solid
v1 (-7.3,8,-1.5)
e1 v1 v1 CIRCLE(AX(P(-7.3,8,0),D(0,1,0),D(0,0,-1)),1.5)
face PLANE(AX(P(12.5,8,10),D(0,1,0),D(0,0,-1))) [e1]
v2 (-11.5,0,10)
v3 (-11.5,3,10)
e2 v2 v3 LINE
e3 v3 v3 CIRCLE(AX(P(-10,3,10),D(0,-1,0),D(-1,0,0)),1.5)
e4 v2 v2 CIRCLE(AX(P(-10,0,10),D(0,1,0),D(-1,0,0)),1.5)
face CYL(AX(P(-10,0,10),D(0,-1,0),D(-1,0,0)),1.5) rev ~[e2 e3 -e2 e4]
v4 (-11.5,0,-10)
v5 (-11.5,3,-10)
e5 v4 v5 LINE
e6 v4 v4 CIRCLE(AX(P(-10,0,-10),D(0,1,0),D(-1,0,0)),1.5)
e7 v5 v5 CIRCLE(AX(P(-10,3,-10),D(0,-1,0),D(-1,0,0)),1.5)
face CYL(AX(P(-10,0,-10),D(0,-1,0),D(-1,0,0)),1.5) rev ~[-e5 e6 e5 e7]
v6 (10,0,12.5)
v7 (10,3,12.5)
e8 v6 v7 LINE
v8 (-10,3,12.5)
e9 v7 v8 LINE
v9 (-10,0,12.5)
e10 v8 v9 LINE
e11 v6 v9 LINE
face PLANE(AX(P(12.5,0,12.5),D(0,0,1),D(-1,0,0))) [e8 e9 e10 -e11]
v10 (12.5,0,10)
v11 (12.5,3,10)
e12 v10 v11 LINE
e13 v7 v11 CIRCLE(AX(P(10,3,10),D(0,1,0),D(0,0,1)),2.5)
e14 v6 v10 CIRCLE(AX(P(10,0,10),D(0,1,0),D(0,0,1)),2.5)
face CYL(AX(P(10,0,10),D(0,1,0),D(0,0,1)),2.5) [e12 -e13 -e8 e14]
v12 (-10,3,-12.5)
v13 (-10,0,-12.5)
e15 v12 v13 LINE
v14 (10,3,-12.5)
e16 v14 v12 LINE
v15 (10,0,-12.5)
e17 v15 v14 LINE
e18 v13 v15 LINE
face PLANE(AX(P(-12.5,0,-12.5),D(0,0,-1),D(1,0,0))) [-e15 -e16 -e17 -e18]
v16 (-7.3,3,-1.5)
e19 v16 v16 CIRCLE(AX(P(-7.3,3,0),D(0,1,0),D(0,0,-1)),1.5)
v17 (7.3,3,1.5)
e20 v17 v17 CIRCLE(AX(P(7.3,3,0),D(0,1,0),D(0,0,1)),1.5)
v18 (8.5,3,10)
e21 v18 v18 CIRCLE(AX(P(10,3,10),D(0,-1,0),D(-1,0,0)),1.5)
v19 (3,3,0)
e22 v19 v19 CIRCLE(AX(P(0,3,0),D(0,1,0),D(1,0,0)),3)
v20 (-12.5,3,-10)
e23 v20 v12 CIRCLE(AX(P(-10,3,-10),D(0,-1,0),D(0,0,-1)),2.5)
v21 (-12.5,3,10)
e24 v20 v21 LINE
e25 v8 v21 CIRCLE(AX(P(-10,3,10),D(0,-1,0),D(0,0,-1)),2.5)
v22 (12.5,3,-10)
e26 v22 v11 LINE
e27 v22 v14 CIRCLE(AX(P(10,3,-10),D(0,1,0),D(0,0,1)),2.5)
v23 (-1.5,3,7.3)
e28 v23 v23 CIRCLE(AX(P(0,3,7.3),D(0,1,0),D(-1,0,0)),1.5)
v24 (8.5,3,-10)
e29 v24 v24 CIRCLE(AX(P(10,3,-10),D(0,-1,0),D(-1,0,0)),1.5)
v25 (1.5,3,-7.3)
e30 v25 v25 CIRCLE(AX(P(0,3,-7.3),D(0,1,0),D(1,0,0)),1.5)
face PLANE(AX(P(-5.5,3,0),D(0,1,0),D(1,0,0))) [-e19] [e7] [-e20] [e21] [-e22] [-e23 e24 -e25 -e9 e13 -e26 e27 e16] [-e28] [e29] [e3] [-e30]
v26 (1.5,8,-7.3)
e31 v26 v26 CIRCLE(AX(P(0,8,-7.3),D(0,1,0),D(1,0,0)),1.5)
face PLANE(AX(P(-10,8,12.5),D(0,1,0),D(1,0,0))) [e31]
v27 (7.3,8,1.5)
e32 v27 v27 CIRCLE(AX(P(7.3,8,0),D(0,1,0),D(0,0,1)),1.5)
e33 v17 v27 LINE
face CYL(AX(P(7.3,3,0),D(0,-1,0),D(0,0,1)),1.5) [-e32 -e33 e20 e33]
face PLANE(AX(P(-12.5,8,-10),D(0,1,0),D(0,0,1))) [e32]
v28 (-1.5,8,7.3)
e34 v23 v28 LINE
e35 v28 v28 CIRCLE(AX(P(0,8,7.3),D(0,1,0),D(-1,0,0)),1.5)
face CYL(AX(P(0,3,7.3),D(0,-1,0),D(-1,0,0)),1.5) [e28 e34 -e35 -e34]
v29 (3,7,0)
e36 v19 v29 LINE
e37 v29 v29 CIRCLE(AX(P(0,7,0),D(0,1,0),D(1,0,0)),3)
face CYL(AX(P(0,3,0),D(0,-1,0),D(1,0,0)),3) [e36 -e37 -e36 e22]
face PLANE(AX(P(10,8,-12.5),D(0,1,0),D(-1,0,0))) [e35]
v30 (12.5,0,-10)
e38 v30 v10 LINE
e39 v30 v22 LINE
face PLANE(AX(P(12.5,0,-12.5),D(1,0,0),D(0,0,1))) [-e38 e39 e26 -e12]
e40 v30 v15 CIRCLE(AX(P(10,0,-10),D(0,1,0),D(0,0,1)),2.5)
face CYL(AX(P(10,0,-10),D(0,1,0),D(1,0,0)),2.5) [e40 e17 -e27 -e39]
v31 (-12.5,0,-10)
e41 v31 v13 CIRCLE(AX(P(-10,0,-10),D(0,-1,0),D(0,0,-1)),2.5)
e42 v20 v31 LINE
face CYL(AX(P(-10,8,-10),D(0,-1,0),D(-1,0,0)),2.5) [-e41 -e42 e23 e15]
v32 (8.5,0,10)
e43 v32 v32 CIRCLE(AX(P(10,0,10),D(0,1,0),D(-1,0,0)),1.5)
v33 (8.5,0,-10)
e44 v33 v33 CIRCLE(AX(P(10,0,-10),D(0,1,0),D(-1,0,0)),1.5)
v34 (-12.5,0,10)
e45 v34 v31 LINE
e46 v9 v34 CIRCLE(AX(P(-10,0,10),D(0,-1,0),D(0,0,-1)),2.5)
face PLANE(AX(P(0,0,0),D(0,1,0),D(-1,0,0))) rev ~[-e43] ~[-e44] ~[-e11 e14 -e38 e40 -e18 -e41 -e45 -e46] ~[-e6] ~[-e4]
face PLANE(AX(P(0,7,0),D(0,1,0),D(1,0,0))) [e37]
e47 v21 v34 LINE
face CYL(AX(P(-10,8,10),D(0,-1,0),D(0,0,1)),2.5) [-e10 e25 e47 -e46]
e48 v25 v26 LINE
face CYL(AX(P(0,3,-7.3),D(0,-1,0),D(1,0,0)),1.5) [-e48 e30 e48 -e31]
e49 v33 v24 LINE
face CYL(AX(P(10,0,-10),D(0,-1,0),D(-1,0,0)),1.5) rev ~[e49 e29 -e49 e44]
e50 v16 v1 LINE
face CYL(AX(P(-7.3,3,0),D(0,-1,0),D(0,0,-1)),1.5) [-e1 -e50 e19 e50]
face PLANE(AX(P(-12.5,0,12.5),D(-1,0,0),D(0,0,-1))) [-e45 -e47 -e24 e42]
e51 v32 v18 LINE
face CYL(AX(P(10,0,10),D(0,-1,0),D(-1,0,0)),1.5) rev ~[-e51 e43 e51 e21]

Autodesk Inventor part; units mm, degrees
ref_plane "YZ Plane" through (0, 0, 0) normal (1, 0, 0) x (0, 1, 0)
ref_plane "XZ Plane" through (0, 0, 0) normal (0, 1, 0) x (-1, 0, 0)
ref_plane "XY Plane" through (0, 0, 0) normal (0, 0, 1) x (1, 0, 0)
sketch "Sketch1" plane through (0, 0, 0) normal (0, 1, 0) x (-1, 0, 0)
  line L0 (-12.5, 12.5) -> (12.5, 12.5)
  line L1 (12.5, 12.5) -> (12.5, -12.5)
  line L2 (12.5, -12.5) -> (-12.5, -12.5)
  line L3 (-12.5, -12.5) -> (-12.5, 12.5)
  line L4 (-12.5, 12.5) -> (12.5, -12.5) construction
  line L5 (12.5, 12.5) -> (-12.5, -12.5) construction
  line L6 (-10, 10) -> (10, 10) construction
  line L7 (10, 10) -> (10, -10) construction
  line L8 (10, -10) -> (-10, -10) construction
  line L9 (-10, -10) -> (-10, 10) construction
  line L10 (-10, 10) -> (10, -10) construction
  line L11 (10, 10) -> (-10, -10) construction
  circle A0 centre (10, 10) radius 1.5
  circle A1 centre (10, -10) radius 1.5
  circle A2 centre (-10, -10) radius 1.5
  circle A3 centre (-10, 10) radius 1.5
  point P0 (0, 0)
  dimension "d0" = 25
  dimension "d1" = 25
  dimension "d2" = 3
  dimension "d3" = 3
  dimension "d4" = 3
  dimension "d5" = 3
  dimension "d6" = 20
extrude "Extrusion1" add sketch "Sketch1" along normal blind 3
sketch "Sketch2" plane through (0, 3, 0) normal (0, 1, 0) x (1, 0, 0)
  circle A0 centre (0, 0) radius 3
  circle A1 centre (-5.5, 0) radius 1.5
  circle A2 centre (-2.75, -4.7631) radius 1.5
  circle A3 centre (2.75, -4.7631) radius 1.5
  circle A4 centre (5.5, 0) radius 1.5
  circle A5 centre (2.75, 4.7631) radius 1.5
  circle A6 centre (-2.75, 4.7631) radius 1.5
  dimension "d9" = 6
  dimension "d10" = 3
  dimension "d11" = 5.5
  dimension "d14" = 360
extrude "Extrusion2" add sketch "Sketch2" along normal blind 5 contours A1 | A2 | A3 | A4 | A5 | A6
sketch "Sketch3" plane through (0, 3, 0) normal (0, 1, 0) x (1, 0, 0)
  circle A0 centre (0, 0) radius 3
  dimension "d18" = 6
extrude "Extrusion3" add sketch "Sketch3" along normal blind 4
sketch "Sketch5" plane through (-5.5, 8, 0) normal (0, 1, 0) x (1, 0, 0)
  circle A0 centre (0, 0) radius 2.5
  circle A1 centre (2.75, -4.7631) radius 2.5
  circle A2 centre (8.25, -4.7631) radius 2.5
  circle A3 centre (11, 0) radius 2.5
  circle A4 centre (8.25, 4.7631) radius 2.5
  circle A5 centre (2.75, 4.7631) radius 2.5
  circle A6 centre (5.5, 0) radius 3.5
  circle A7 centre (0, 0) radius 1.4875
  circle A8 centre (2.75, -4.7631) radius 1.4875
  circle A9 centre (8.25, -4.7631) radius 1.4875
  circle A10 centre (11, 0) radius 1.4875
  circle A11 centre (8.25, 4.7631) radius 1.4875
  circle A12 centre (2.75, 4.7631) radius 1.4875
  line L0 (18, 12.5) -> (-7, 12.5) projected
  line L1 (18, -12.5) -> (-7, -12.5)
  line L2 (-7, -12.5) -> (-7, 12.5)
  line L3 (-7, 12.5) -> (18, 12.5)
  line L4 (18, 12.5) -> (18, -12.5)
  line L5 (18, -12.5) -> (-7, 12.5) construction
  line L6 (-7, -12.5) -> (18, 12.5) construction
  circle A13 centre (-4.5, -10) radius 1.5 projected
  circle A14 centre (-4.5, -10) radius 1.65
  circle A15 centre (-4.5, 10) radius 1.5 projected
  circle A16 centre (-4.5, 10) radius 1.65
  circle A17 centre (15.5, 10) radius 1.5 projected
  circle A18 centre (15.5, 10) radius 1.65
  circle A19 centre (15.5, -10) radius 1.5 projected
  circle A20 centre (15.5, -10) radius 1.65
  point P0 (8.7955, -1.179)
  point P1 (8.1687, -2.2645)
  point P2 (6.1267, -3.4434)
  point P3 (4.8733, -3.4434)
  point P4 (2.8313, -2.2645)
  point P5 (2.2045, -1.179)
  point P6 (2.2045, 1.179)
  point P7 (2.8313, 2.2645)
  point P8 (4.8733, 3.4434)
  point P9 (6.1267, 3.4434)
  point P10 (8.1687, 2.2645)
  point P11 (8.7955, 1.179)
  dimension "d21" = 5
  dimension "d24" = 360
  dimension "d26" = 7
  dimension "d29" = 360
extrude "Extrusion4" add sketch "Sketch5" against normal blind 5 contours L4 L1 L2 L0 | A14 | A16 | A18 | A20
fillet "Fillet1" radius 0.5 12 edges at (-2.6687, 5.5, 2.2645) (-0.6267, 5.5, 3.4434) (2.6687, 5.5, 2.2645) (0.6267, 5.5, 3.4434) (-3.2955, 5.5, -1.179) (-3.2955, 5.5, 1.179) (-0.6267, 5.5, -3.4434) (-2.6687, 5.5, -2.2645) (2.6687, 5.5, -2.2645) (0.6267, 5.5, -3.4434) (3.2955, 5.5, 1.179) (3.2955, 5.5, -1.179)
fillet "Fillet2" radius 2.5 4 edges at (12.5, 4, -12.5) (-12.5, 4, -12.5) (12.5, 4, 12.5) (-12.5, 4, 12.5)
sketch "Sketch7" plane through (0, 7, 0) normal (0, 1, 0) x (1, 0, 0)
  circle A0 centre (0, 0) radius 1
extrude "Extrusion5" [suppressed]
sketch "Sketch8" plane through (-5.5, 8, 0) normal (0, 1, 0) x (1, 0, 0)
  circle A0 centre (0, 0) radius 1
  point P0 (5.5, 0)
  dimension "d37" = 2
extrude "Extrusion6" [suppressed]
pattern_circular "Circular Pattern1" [suppressed]
sketch "Sketch9" plane through (-5.5, 8, 0) normal (0, 1, 0) x (1, 0, 0)
  line L0 (-7.0276, -1) -> (-2, -1)
  line L1 (-2, -1) -> (-2, 1)
  line L2 (-2, 1) -> (-7.0276, 1)
  line L3 (-7.0276, 1) -> (-7.0276, -1)
  line L4 (-7.0276, -1) -> (-2, 1) construction
  line L5 (-2, -1) -> (-7.0276, 1) construction
  point P0 (5.5, 0)
  point P1 (-4.5138, 0)
extrude "Extrusion7" cut sketch "Sketch9" against normal blind 5
thicken "Thicken1" operation add thickness 5 both sides no extend neighbours yes toward (0, -1, 0) faces at (0.7594, 8, 10.7394)
sketch "Sketch10" plane through (5.5, 8, 0) normal (0, 1, 0) x (1, 0, 0)
  circle A0 centre (-5.5, 0) radius 3.2016
  circle A1 centre (-5.5, 0) radius 8.2006
extrude "Extrusion8" cut sketch "Sketch10" against normal blind 5
sketch "Sketch12" plane through (-10, 3, 12.5) normal (0, 1, 0) x (1, 0, 0)
  circle A0 centre (10, 12.5) radius 7.3 construction
  circle A1 centre (10, 19.8) radius 1.5
  dimension "d49" = 14.6
  dimension "d50" = 3
extrude "Extrusion9" add sketch "Sketch12" along normal blind 5
pattern_circular "Circular Pattern2" count 4 over 360 about axis through (0, 3, 0) along (0, 1, 0) of "Extrusion9"
properties part number "PDMS stretcher mould A (x4)"
